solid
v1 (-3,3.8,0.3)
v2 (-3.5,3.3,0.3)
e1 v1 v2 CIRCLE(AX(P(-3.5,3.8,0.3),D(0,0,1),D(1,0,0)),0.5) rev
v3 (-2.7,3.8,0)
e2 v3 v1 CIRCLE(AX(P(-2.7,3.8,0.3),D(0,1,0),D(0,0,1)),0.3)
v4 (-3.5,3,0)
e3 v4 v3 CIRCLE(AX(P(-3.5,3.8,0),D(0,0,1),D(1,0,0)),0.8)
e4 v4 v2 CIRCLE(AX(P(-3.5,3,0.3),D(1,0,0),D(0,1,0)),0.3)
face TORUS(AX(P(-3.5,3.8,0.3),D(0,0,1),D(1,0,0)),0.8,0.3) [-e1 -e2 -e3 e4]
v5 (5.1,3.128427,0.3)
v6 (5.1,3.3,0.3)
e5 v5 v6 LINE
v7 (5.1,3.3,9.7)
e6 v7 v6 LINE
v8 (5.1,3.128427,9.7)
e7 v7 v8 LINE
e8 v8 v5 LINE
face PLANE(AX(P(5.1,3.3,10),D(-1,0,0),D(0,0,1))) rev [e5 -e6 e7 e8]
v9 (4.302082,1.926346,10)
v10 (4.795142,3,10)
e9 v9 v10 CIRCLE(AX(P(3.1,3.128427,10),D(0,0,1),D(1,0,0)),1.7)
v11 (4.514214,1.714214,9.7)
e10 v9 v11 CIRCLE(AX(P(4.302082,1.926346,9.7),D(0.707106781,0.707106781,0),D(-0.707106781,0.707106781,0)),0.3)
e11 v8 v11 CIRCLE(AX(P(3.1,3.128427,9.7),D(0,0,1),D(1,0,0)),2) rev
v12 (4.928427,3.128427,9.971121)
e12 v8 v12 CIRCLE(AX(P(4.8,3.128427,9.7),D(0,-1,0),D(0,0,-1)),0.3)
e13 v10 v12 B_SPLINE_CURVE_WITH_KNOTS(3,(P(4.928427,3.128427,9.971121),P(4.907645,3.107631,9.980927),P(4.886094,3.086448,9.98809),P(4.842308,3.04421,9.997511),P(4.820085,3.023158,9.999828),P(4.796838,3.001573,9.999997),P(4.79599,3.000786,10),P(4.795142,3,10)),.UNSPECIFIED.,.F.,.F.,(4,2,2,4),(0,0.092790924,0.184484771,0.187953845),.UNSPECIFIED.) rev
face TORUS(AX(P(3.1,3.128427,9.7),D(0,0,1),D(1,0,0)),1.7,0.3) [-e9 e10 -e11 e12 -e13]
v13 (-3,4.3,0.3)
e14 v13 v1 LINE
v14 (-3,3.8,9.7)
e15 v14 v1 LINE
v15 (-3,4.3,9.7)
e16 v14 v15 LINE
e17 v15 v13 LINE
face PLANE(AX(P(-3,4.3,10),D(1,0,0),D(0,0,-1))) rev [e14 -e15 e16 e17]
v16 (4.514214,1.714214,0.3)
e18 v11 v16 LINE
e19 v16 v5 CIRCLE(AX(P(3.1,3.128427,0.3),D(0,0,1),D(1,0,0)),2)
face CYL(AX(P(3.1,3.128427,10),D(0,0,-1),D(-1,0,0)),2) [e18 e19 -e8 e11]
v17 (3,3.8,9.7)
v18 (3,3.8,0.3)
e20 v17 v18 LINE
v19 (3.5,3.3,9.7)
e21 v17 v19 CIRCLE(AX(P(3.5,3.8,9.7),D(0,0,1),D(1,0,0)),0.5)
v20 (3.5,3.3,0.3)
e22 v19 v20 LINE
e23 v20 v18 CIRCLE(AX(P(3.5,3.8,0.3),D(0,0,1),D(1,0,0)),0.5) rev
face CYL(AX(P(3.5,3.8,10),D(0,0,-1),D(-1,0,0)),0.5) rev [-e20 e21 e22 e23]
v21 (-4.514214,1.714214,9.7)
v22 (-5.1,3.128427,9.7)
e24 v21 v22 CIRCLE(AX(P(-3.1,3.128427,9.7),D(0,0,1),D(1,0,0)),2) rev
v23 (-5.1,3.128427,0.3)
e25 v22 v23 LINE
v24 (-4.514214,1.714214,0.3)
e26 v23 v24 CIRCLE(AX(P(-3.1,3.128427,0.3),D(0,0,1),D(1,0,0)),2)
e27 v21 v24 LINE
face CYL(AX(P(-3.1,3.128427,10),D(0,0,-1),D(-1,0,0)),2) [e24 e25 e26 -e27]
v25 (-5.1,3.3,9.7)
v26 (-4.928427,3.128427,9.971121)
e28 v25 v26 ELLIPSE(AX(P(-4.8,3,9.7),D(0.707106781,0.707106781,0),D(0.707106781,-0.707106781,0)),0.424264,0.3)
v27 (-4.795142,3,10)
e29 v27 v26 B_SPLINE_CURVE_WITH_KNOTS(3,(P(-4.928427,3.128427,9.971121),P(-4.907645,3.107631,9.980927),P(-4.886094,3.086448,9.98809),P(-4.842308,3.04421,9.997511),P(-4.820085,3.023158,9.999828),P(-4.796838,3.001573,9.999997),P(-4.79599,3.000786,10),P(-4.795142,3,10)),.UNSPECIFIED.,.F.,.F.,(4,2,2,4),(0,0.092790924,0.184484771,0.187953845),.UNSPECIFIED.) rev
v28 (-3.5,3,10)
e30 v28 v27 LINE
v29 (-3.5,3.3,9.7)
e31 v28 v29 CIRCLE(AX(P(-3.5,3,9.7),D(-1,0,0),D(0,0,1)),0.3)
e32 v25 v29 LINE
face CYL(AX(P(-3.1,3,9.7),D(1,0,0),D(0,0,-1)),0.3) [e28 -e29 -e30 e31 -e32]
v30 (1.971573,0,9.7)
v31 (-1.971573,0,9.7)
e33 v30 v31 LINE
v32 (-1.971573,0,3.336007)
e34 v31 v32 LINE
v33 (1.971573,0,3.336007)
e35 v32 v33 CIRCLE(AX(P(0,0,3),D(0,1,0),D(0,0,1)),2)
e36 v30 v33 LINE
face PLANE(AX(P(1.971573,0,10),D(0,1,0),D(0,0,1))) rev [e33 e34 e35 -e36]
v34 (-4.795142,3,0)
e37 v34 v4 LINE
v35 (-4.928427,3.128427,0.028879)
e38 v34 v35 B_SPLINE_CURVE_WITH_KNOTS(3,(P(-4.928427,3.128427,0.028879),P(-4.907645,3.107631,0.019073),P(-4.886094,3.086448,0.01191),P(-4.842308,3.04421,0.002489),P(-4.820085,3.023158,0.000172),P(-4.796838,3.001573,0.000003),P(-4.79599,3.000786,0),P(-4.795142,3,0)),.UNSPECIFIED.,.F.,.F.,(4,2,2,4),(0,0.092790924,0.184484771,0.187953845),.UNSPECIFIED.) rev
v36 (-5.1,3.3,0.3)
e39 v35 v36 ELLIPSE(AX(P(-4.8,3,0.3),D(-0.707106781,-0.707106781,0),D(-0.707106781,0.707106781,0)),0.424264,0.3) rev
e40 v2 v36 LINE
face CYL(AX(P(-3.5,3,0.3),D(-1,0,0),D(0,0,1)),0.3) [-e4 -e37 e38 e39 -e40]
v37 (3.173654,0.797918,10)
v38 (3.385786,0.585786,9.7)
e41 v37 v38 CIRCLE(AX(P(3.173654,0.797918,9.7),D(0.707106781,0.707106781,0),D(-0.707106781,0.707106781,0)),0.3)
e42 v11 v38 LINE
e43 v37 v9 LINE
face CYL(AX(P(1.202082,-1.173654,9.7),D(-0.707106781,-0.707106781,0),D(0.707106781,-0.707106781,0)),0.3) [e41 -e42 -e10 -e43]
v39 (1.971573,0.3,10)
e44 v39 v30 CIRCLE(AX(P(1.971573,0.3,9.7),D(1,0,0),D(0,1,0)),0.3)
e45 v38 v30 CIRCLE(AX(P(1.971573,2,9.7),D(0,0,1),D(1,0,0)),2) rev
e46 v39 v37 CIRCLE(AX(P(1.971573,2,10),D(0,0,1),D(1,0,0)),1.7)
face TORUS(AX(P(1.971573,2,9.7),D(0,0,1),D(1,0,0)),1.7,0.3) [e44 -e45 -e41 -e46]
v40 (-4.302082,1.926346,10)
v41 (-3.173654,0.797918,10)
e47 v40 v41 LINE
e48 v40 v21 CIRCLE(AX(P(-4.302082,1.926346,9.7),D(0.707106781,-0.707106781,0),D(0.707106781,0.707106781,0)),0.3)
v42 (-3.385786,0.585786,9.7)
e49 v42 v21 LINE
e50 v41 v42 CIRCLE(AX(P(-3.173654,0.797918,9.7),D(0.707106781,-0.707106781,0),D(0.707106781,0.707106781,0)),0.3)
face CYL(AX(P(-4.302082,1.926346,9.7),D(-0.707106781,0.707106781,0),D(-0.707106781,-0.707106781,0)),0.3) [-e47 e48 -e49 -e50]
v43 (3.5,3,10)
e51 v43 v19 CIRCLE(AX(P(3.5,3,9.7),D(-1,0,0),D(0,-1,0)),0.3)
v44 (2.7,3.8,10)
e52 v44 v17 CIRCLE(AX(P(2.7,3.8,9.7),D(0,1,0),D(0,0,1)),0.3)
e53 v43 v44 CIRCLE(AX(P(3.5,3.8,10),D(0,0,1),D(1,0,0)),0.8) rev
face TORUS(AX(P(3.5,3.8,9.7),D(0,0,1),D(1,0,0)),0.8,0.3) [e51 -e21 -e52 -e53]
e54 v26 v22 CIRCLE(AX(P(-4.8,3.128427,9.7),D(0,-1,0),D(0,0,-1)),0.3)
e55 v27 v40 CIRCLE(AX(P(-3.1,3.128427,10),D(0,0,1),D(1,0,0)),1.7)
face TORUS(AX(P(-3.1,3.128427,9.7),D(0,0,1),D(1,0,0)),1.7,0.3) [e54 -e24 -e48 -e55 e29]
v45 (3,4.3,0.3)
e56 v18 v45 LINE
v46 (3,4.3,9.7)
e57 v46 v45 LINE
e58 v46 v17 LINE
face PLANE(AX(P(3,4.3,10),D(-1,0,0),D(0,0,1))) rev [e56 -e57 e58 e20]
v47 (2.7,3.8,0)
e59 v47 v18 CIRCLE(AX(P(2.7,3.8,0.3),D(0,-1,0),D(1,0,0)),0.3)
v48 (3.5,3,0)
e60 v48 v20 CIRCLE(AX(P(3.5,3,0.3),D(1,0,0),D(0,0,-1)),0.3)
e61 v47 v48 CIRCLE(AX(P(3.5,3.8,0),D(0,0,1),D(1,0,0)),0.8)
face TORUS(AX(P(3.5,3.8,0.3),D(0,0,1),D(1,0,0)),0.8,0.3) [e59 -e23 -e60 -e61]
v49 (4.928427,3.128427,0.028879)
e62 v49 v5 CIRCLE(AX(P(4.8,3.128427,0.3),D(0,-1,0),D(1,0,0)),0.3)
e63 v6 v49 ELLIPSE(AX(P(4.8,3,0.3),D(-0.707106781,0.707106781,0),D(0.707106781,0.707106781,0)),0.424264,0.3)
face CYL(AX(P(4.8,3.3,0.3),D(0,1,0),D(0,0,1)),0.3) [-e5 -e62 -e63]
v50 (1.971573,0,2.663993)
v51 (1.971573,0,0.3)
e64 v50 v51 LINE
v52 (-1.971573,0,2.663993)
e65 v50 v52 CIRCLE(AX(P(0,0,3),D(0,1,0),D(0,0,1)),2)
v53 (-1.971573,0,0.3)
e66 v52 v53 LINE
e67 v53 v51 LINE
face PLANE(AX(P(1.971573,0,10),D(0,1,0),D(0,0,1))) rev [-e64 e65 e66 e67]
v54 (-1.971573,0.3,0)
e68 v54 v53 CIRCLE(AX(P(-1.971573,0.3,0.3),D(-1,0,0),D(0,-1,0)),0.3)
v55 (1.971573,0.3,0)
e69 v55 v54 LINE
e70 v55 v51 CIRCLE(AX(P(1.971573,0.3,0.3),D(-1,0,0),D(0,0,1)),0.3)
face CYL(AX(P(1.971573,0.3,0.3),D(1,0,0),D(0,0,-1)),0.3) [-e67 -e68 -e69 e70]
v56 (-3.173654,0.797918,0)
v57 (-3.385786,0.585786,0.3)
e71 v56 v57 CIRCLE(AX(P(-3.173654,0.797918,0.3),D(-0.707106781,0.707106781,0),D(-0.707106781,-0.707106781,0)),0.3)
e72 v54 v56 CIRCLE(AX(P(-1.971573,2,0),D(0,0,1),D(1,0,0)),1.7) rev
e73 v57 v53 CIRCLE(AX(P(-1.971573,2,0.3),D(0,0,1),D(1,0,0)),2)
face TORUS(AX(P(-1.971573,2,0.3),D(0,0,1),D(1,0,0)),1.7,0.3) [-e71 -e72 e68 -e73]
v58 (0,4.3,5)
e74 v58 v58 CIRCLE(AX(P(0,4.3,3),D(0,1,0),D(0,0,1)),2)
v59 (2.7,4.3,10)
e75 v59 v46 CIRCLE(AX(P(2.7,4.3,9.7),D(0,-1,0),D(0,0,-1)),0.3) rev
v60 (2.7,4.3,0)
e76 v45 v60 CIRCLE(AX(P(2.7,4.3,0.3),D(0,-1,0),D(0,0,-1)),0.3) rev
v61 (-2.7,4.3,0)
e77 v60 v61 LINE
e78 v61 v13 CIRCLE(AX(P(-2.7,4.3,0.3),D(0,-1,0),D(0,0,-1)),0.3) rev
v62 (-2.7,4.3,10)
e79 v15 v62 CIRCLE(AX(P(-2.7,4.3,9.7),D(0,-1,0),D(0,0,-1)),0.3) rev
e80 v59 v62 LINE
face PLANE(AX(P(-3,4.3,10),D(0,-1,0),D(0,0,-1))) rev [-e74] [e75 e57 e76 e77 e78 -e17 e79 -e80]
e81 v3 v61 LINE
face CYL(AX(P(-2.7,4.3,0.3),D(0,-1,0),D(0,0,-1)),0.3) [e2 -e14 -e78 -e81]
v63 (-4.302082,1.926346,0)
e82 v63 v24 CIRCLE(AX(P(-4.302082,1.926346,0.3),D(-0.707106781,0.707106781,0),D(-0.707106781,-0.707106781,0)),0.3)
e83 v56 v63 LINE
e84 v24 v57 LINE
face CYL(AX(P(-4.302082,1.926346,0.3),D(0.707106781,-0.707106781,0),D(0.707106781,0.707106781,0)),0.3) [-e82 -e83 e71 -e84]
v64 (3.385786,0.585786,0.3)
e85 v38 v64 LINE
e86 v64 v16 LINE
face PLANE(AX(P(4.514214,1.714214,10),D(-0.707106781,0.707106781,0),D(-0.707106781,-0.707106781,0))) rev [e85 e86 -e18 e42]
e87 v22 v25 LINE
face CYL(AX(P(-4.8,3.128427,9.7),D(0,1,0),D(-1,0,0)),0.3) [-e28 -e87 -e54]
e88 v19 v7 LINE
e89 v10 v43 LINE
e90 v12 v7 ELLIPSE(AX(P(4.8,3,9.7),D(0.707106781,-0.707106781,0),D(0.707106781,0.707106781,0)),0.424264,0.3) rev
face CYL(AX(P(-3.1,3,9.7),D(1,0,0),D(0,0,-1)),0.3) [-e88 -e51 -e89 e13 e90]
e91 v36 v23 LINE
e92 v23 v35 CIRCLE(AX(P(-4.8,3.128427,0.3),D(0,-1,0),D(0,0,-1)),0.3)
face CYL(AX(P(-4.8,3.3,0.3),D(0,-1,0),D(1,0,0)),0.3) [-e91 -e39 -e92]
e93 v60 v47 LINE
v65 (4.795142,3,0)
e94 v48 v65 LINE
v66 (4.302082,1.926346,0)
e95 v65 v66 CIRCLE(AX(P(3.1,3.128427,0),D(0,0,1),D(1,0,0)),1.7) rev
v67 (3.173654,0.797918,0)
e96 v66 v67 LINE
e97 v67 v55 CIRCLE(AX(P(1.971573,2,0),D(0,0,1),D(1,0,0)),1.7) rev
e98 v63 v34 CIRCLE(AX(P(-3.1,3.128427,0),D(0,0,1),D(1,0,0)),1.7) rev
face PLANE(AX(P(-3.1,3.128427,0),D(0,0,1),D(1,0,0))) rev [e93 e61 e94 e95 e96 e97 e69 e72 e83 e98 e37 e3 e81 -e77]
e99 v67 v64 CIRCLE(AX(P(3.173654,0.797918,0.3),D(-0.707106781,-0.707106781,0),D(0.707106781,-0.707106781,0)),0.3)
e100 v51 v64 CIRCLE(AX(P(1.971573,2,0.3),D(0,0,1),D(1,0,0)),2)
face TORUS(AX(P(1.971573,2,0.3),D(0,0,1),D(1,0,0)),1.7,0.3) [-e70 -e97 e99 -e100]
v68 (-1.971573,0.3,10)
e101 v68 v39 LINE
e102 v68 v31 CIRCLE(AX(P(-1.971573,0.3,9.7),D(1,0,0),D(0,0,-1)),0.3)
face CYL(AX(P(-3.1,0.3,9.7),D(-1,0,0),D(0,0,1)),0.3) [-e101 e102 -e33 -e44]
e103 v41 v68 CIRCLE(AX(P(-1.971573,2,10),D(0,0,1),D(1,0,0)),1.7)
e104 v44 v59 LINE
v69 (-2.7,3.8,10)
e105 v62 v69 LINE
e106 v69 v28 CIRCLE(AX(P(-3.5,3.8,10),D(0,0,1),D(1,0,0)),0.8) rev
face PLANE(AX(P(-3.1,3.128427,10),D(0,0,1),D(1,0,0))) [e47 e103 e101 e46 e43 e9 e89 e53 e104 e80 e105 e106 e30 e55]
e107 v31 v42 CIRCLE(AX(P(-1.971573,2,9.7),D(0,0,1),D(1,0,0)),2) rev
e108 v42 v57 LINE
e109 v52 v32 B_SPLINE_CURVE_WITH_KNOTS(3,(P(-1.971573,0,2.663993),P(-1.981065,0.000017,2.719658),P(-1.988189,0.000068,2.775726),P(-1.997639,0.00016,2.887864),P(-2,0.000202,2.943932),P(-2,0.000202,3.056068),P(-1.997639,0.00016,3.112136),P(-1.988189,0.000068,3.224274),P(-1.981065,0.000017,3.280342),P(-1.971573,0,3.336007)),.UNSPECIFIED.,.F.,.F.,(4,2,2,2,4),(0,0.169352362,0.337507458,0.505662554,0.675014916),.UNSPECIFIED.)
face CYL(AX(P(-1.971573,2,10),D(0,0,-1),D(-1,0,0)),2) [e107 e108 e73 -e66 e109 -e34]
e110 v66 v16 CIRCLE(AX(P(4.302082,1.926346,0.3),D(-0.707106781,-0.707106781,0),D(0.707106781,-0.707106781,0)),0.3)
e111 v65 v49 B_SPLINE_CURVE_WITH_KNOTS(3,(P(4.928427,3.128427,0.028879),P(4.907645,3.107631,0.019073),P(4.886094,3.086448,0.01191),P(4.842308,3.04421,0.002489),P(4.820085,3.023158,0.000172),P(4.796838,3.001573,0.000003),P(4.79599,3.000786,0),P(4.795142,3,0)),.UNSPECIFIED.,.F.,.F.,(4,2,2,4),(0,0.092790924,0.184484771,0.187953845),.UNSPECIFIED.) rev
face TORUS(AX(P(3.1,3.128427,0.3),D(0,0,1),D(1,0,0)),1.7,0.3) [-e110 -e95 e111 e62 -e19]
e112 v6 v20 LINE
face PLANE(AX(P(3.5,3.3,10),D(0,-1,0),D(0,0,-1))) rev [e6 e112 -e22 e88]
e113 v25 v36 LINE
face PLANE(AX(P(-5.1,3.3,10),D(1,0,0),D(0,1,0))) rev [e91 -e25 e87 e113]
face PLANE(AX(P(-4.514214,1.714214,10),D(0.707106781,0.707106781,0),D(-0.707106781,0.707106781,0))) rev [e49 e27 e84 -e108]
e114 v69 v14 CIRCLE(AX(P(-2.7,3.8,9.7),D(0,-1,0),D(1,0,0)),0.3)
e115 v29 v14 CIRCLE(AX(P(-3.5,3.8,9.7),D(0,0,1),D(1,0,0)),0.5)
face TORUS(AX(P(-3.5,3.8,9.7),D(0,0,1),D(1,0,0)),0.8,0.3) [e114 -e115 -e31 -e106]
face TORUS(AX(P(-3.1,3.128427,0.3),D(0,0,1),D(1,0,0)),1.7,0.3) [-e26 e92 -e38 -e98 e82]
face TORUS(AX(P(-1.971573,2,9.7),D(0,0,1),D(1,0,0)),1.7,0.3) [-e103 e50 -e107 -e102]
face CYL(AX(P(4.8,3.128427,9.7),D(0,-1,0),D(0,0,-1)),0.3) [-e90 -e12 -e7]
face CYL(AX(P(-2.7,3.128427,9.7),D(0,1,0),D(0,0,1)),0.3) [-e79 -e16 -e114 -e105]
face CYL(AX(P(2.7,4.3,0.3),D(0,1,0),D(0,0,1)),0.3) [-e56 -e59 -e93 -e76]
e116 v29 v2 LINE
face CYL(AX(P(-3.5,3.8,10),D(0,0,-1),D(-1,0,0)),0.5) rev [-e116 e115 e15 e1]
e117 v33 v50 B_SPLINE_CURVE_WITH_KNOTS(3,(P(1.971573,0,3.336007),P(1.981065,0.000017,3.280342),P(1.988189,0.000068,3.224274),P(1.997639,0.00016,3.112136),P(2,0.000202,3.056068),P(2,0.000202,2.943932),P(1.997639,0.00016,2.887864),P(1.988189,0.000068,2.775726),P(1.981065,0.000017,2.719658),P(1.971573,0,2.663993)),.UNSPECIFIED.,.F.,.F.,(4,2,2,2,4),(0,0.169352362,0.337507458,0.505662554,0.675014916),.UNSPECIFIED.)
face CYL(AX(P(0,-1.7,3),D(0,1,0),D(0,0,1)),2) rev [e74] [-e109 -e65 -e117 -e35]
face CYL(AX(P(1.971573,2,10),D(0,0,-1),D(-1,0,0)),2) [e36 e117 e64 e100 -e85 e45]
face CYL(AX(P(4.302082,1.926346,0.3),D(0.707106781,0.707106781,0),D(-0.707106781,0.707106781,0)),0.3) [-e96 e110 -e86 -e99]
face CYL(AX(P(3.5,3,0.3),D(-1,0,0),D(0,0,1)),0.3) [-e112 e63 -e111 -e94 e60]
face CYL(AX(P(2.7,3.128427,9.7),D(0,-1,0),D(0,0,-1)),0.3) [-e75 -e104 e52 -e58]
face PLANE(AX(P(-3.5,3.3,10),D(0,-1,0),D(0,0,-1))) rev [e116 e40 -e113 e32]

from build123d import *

# Parameters (mm, degrees)
EXTRUDE_1_DEPTH     = 10
FILLET_3_R          = 0.3
SKETCH_2_R          = 2
CUT_EXTRUDE_1_DEPTH = 6


with BuildPart() as part:
    # 草图1 → 凸台-拉伸1 (new body)
    with BuildSketch(Plane.XY):
        with BuildLine():
            Line((-3, 4.3), (3, 4.3))
            Line((3, 4.3), (3, 3.8))
            ThreePointArc((3, 3.8), (3.146446609, 3.446446609), (3.5, 3.3))
            Line((3.5, 3.3), (5.1, 3.3))
            Line((5.1, 3.3), (5.1, 3.128427125))
            ThreePointArc((5.1, 3.128427125), (4.947759065, 2.36306026), (4.514213562, 1.714213562))
            Line((4.514213562, 1.714213562), (3.385786438, 0.585786438))
            ThreePointArc((3.385786438, 0.585786438), (2.73693974, 0.152240935), (1.971572875, 0))
            Line((1.971572875, 0), (-1.971572875, 0))
            ThreePointArc((-1.971572875, 0), (-2.73693974, 0.152240935), (-3.385786438, 0.585786438))
            Line((-3.385786438, 0.585786438), (-4.514213562, 1.714213562))
            ThreePointArc((-4.514213562, 1.714213562), (-4.947759065, 2.36306026), (-5.1, 3.128427125))
            Line((-5.1, 3.128427125), (-5.1, 3.3))
            Line((-5.1, 3.3), (-3.5, 3.3))
            ThreePointArc((-3.5, 3.3), (-3.146446609, 3.446446609), (-3, 3.8))
            Line((-3, 3.8), (-3, 4.3))
        make_face()
    extrude(amount=EXTRUDE_1_DEPTH)

    # 圆角3
    # the kernel refuses this fillet: 0.3 mm, written as the material it takes off along each edge
    with BuildSketch(Plane(origin=(-3, 3.8, 10), x_dir=(0, 0, -1), z_dir=(0, 1, 0)), Plane(origin=(3, 5.05, 10), x_dir=(0, 0, -1), z_dir=(0, -1, 0))) as fillet_3_piece_1:
        with BuildLine():
            CenterArc((FILLET_3_R, -FILLET_3_R), FILLET_3_R, 90, 90)
            Line((0, -FILLET_3_R), (0, 0))
            Line((0, 0), (FILLET_3_R, 0))
        make_face()
    extrude(amount=1.25, mode=Mode.SUBTRACT)
    with BuildSketch(Plane(origin=(3, 5.05, 0), x_dir=(0, 0, 1), z_dir=(0, -1, 0)), Plane(origin=(-3, 3.8, 0), x_dir=(0, 0, 1), z_dir=(0, 1, 0))) as fillet_3_piece_2:
        with BuildLine():
            CenterArc((FILLET_3_R, FILLET_3_R), FILLET_3_R, 180, 90)
            Line((0, FILLET_3_R), (0, 0))
            Line((0, 0), (FILLET_3_R, 0))
        make_face()
    extrude(amount=1.25, mode=Mode.SUBTRACT)
    with BuildSketch(Plane(origin=(4.514213562, 1.714213562, 10), x_dir=(0, 0, -1), z_dir=(-0.7071067811865436, -0.7071067811865515, 0)), Plane(origin=(-3.385786438, 0.585786438, 10), x_dir=(0, 0, -1), z_dir=(-0.7071067811865436, 0.7071067811865515, 0))) as fillet_3_piece_3:
        with BuildLine():
            CenterArc((FILLET_3_R, -FILLET_3_R), FILLET_3_R, 90, 90)
            Line((0, -FILLET_3_R), (0, 0))
            Line((0, 0), (FILLET_3_R, 0))
        make_face()
    extrude(amount=1.595836944, mode=Mode.SUBTRACT)
    with BuildSketch(Plane(origin=(1.971572875, 2, 10), x_dir=(0.7071067811865542, -0.7071067811865409, 0), z_dir=(0.7071067811865409, 0.7071067811865542, 0))) as fillet_3_piece_4:
        with BuildLine():
            CenterArc((2 - FILLET_3_R, FILLET_3_R), FILLET_3_R, 270, 90)
            Line((2 - FILLET_3_R, 0), (2, 0))
            Line((2, 0), (2, FILLET_3_R))
        make_face()
    revolve(axis=Axis((1.971572875, 2, 10), (0, 0, -1)), revolution_arc=45, mode=Mode.SUBTRACT)
    with BuildSketch(Plane(origin=(1.971572875, 0, 10), x_dir=(0, 0, -1), z_dir=(-1, 0, 0))) as fillet_3_piece_5:
        with BuildLine():
            CenterArc((FILLET_3_R, -FILLET_3_R), FILLET_3_R, 90, 90)
            Line((0, -FILLET_3_R), (0, 0))
            Line((0, 0), (FILLET_3_R, 0))
        make_face()
    extrude(amount=3.943145751, mode=Mode.SUBTRACT)
    with BuildSketch(Plane(origin=(-1.971572875, 2, 10), x_dir=(0, -1, 0), z_dir=(1, 0, 0))) as fillet_3_piece_6:
        with BuildLine():
            CenterArc((2 - FILLET_3_R, FILLET_3_R), FILLET_3_R, 270, 90)
            Line((2 - FILLET_3_R, 0), (2, 0))
            Line((2, 0), (2, FILLET_3_R))
        make_face()
    revolve(axis=Axis((-1.971572875, 2, 10), (0, 0, -1)), revolution_arc=45, mode=Mode.SUBTRACT)
    with BuildSketch(Plane(origin=(-3.1, 3.128427125, 10), x_dir=(-0.7071067811865485, -0.7071067811865466, 0), z_dir=(0.7071067811865466, -0.7071067811865485, 0))) as fillet_3_piece_7:
        with BuildLine():
            CenterArc((2 - FILLET_3_R, FILLET_3_R), FILLET_3_R, 270, 90)
            Line((2 - FILLET_3_R, 0), (2, 0))
            Line((2, 0), (2, FILLET_3_R))
        make_face()
    revolve(axis=Axis((-3.1, 3.128427125, 10), (0, 0, -1)), revolution_arc=45, mode=Mode.SUBTRACT)
    with BuildSketch(Plane(origin=(-5.85, 3.3, 10), x_dir=(0, 0, -1), z_dir=(1, 0, 0)), Plane(origin=(3.5, 3.3, 10), x_dir=(0, 0, -1), z_dir=(1, 0, 0))) as fillet_3_piece_8:
        with BuildLine():
            CenterArc((FILLET_3_R, -FILLET_3_R), FILLET_3_R, 90, 90)
            Line((0, -FILLET_3_R), (0, 0))
            Line((0, 0), (FILLET_3_R, 0))
        make_face()
    extrude(amount=2.35, mode=Mode.SUBTRACT)
    with BuildSketch(Plane(origin=(-3.5, 3.8, 10), x_dir=(0, -1, 0), z_dir=(-1, 0, 0))) as fillet_3_piece_9:
        with BuildLine():
            CenterArc((0.5 + FILLET_3_R, -FILLET_3_R), FILLET_3_R, 90, 90)
            Line((0.5 + FILLET_3_R, 0), (0.5, 0))
            Line((0.5, 0), (0.5, -FILLET_3_R))
        make_face()
    revolve(axis=Axis((-3.5, 3.8, 10), (0, 0, 1)), revolution_arc=90, mode=Mode.SUBTRACT)
    with BuildSketch(Plane(origin=(3.5, 3.3, 0), x_dir=(0, 0, 1), z_dir=(1, 0, 0)), Plane(origin=(-5.85, 3.3, 0), x_dir=(0, 0, 1), z_dir=(1, 0, 0))) as fillet_3_piece_10:
        with BuildLine():
            CenterArc((FILLET_3_R, FILLET_3_R), FILLET_3_R, 180, 90)
            Line((0, FILLET_3_R), (0, 0))
            Line((0, 0), (FILLET_3_R, 0))
        make_face()
    extrude(amount=2.35, mode=Mode.SUBTRACT)
    with BuildSketch(Plane(origin=(3.5, 3.8, 0), x_dir=(-1, 0, 0), z_dir=(0, 1, 0))) as fillet_3_piece_11:
        with BuildLine():
            CenterArc((0.5 + FILLET_3_R, FILLET_3_R), FILLET_3_R, 180, 90)
            Line((0.5 + FILLET_3_R, 0), (0.5, 0))
            Line((0.5, 0), (0.5, FILLET_3_R))
        make_face()
    revolve(axis=Axis((3.5, 3.8, 0), (0, 0, 1)), revolution_arc=90, mode=Mode.SUBTRACT)
    with BuildSketch(Plane(origin=(-3.385786438, 0.585786438, 0), x_dir=(0, 0, 1), z_dir=(-0.7071067811865436, 0.7071067811865515, 0)), Plane(origin=(4.514213562, 1.714213562, 0), x_dir=(0, 0, 1), z_dir=(-0.7071067811865436, -0.7071067811865515, 0))) as fillet_3_piece_12:
        with BuildLine():
            CenterArc((FILLET_3_R, FILLET_3_R), FILLET_3_R, 180, 90)
            Line((0, FILLET_3_R), (0, 0))
            Line((0, 0), (FILLET_3_R, 0))
        make_face()
    extrude(amount=1.595836944, mode=Mode.SUBTRACT)
    with BuildSketch(Plane(origin=(-1.971572875, 2, 0), x_dir=(0, -1, 0), z_dir=(1, 0, 0))) as fillet_3_piece_13:
        with BuildLine():
            CenterArc((2 - FILLET_3_R, -FILLET_3_R), FILLET_3_R, 0, 90)
            Line((2 - FILLET_3_R, 0), (2, 0))
            Line((2, 0), (2, -FILLET_3_R))
        make_face()
    revolve(axis=Axis((-1.971572875, 2, 0), (0, 0, -1)), revolution_arc=45, mode=Mode.SUBTRACT)
    with BuildSketch(Plane(origin=(1.971572875, 0, 0), x_dir=(0, 0, 1), z_dir=(-1, 0, 0))) as fillet_3_piece_14:
        with BuildLine():
            CenterArc((FILLET_3_R, FILLET_3_R), FILLET_3_R, 180, 90)
            Line((0, FILLET_3_R), (0, 0))
            Line((0, 0), (FILLET_3_R, 0))
        make_face()
    extrude(amount=3.943145751, mode=Mode.SUBTRACT)
    with BuildSketch(Plane(origin=(1.971572875, 2, 0), x_dir=(0.7071067811865542, -0.7071067811865409, 0), z_dir=(0.7071067811865409, 0.7071067811865542, 0))) as fillet_3_piece_15:
        with BuildLine():
            CenterArc((2 - FILLET_3_R, -FILLET_3_R), FILLET_3_R, 0, 90)
            Line((2 - FILLET_3_R, 0), (2, 0))
            Line((2, 0), (2, -FILLET_3_R))
        make_face()
    revolve(axis=Axis((1.971572875, 2, 0), (0, 0, -1)), revolution_arc=45, mode=Mode.SUBTRACT)
    with BuildSketch(Plane(origin=(3.1, 3.128427125, 0), x_dir=(1, 0, 0), z_dir=(0, 1, 0))) as fillet_3_piece_16:
        with BuildLine():
            CenterArc((2 - FILLET_3_R, -FILLET_3_R), FILLET_3_R, 0, 90)
            Line((2 - FILLET_3_R, 0), (2, 0))
            Line((2, 0), (2, -FILLET_3_R))
        make_face()
    revolve(axis=Axis((3.1, 3.128427125, 0), (0, 0, -1)), revolution_arc=45, mode=Mode.SUBTRACT)
    with BuildSketch(Plane(origin=(3.1, 3.128427125, 10), x_dir=(1, 0, 0), z_dir=(0, 1, 0))) as fillet_3_piece_17:
        with BuildLine():
            CenterArc((2 - FILLET_3_R, FILLET_3_R), FILLET_3_R, 270, 90)
            Line((2 - FILLET_3_R, 0), (2, 0))
            Line((2, 0), (2, FILLET_3_R))
        make_face()
    revolve(axis=Axis((3.1, 3.128427125, 10), (0, 0, -1)), revolution_arc=45, mode=Mode.SUBTRACT)
    with BuildSketch(Plane(origin=(-3.1, 3.128427125, 0), x_dir=(-0.7071067811865485, -0.7071067811865466, 0), z_dir=(0.7071067811865466, -0.7071067811865485, 0))) as fillet_3_piece_18:
        with BuildLine():
            CenterArc((2 - FILLET_3_R, -FILLET_3_R), FILLET_3_R, 0, 90)
            Line((2 - FILLET_3_R, 0), (2, 0))
            Line((2, 0), (2, -FILLET_3_R))
        make_face()
    revolve(axis=Axis((-3.1, 3.128427125, 0), (0, 0, -1)), revolution_arc=45, mode=Mode.SUBTRACT)
    with BuildSketch(Plane(origin=(3.5, 3.8, 10), x_dir=(-1, 0, 0), z_dir=(0, 1, 0))) as fillet_3_piece_19:
        with BuildLine():
            CenterArc((0.5 + FILLET_3_R, -FILLET_3_R), FILLET_3_R, 90, 90)
            Line((0.5 + FILLET_3_R, 0), (0.5, 0))
            Line((0.5, 0), (0.5, -FILLET_3_R))
        make_face()
    revolve(axis=Axis((3.5, 3.8, 10), (0, 0, 1)), revolution_arc=90, mode=Mode.SUBTRACT)
    with BuildSketch(Plane(origin=(-3.5, 3.8, 0), x_dir=(0, -1, 0), z_dir=(-1, 0, 0))) as fillet_3_piece_20:
        with BuildLine():
            CenterArc((0.5 + FILLET_3_R, FILLET_3_R), FILLET_3_R, 180, 90)
            Line((0.5 + FILLET_3_R, 0), (0.5, 0))
            Line((0.5, 0), (0.5, FILLET_3_R))
        make_face()
    revolve(axis=Axis((-3.5, 3.8, 0), (0, 0, 1)), revolution_arc=90, mode=Mode.SUBTRACT)
    with BuildSketch(Plane(origin=(-5.1, 3.128427125, 0), x_dir=(0, 0, 1), z_dir=(0, 1, 0)), Plane(origin=(5.1, 4.05, 0), x_dir=(0, 0, 1), z_dir=(0, -1, 0))) as fillet_3_piece_21:
        with BuildLine():
            CenterArc((FILLET_3_R, FILLET_3_R), FILLET_3_R, 180, 90)
            Line((0, FILLET_3_R), (0, 0))
            Line((0, 0), (FILLET_3_R, 0))
        make_face()
    extrude(amount=0.921572875, mode=Mode.SUBTRACT)
    with BuildSketch(Plane(origin=(5.1, 4.05, 10), x_dir=(0, 0, -1), z_dir=(0, -1, 0)), Plane(origin=(-5.1, 3.128427125, 10), x_dir=(0, 0, -1), z_dir=(0, 1, 0))) as fillet_3_piece_22:
        with BuildLine():
            CenterArc((FILLET_3_R, -FILLET_3_R), FILLET_3_R, 90, 90)
            Line((0, -FILLET_3_R), (0, 0))
            Line((0, 0), (FILLET_3_R, 0))
        make_face()
    extrude(amount=0.921572875, mode=Mode.SUBTRACT)

    # 草图2 → 切除-拉伸1 (cut)
    with BuildSketch(Plane(origin=(0, 4.3, 0), x_dir=(1, 0, 0), z_dir=(0, 1, 0))):
        with Locations(Location((0, -3, 0), (0, 0, 270))):
            Circle(SKETCH_2_R)
    extrude(amount=-CUT_EXTRUDE_1_DEPTH, mode=Mode.SUBTRACT)


solid = part.part
